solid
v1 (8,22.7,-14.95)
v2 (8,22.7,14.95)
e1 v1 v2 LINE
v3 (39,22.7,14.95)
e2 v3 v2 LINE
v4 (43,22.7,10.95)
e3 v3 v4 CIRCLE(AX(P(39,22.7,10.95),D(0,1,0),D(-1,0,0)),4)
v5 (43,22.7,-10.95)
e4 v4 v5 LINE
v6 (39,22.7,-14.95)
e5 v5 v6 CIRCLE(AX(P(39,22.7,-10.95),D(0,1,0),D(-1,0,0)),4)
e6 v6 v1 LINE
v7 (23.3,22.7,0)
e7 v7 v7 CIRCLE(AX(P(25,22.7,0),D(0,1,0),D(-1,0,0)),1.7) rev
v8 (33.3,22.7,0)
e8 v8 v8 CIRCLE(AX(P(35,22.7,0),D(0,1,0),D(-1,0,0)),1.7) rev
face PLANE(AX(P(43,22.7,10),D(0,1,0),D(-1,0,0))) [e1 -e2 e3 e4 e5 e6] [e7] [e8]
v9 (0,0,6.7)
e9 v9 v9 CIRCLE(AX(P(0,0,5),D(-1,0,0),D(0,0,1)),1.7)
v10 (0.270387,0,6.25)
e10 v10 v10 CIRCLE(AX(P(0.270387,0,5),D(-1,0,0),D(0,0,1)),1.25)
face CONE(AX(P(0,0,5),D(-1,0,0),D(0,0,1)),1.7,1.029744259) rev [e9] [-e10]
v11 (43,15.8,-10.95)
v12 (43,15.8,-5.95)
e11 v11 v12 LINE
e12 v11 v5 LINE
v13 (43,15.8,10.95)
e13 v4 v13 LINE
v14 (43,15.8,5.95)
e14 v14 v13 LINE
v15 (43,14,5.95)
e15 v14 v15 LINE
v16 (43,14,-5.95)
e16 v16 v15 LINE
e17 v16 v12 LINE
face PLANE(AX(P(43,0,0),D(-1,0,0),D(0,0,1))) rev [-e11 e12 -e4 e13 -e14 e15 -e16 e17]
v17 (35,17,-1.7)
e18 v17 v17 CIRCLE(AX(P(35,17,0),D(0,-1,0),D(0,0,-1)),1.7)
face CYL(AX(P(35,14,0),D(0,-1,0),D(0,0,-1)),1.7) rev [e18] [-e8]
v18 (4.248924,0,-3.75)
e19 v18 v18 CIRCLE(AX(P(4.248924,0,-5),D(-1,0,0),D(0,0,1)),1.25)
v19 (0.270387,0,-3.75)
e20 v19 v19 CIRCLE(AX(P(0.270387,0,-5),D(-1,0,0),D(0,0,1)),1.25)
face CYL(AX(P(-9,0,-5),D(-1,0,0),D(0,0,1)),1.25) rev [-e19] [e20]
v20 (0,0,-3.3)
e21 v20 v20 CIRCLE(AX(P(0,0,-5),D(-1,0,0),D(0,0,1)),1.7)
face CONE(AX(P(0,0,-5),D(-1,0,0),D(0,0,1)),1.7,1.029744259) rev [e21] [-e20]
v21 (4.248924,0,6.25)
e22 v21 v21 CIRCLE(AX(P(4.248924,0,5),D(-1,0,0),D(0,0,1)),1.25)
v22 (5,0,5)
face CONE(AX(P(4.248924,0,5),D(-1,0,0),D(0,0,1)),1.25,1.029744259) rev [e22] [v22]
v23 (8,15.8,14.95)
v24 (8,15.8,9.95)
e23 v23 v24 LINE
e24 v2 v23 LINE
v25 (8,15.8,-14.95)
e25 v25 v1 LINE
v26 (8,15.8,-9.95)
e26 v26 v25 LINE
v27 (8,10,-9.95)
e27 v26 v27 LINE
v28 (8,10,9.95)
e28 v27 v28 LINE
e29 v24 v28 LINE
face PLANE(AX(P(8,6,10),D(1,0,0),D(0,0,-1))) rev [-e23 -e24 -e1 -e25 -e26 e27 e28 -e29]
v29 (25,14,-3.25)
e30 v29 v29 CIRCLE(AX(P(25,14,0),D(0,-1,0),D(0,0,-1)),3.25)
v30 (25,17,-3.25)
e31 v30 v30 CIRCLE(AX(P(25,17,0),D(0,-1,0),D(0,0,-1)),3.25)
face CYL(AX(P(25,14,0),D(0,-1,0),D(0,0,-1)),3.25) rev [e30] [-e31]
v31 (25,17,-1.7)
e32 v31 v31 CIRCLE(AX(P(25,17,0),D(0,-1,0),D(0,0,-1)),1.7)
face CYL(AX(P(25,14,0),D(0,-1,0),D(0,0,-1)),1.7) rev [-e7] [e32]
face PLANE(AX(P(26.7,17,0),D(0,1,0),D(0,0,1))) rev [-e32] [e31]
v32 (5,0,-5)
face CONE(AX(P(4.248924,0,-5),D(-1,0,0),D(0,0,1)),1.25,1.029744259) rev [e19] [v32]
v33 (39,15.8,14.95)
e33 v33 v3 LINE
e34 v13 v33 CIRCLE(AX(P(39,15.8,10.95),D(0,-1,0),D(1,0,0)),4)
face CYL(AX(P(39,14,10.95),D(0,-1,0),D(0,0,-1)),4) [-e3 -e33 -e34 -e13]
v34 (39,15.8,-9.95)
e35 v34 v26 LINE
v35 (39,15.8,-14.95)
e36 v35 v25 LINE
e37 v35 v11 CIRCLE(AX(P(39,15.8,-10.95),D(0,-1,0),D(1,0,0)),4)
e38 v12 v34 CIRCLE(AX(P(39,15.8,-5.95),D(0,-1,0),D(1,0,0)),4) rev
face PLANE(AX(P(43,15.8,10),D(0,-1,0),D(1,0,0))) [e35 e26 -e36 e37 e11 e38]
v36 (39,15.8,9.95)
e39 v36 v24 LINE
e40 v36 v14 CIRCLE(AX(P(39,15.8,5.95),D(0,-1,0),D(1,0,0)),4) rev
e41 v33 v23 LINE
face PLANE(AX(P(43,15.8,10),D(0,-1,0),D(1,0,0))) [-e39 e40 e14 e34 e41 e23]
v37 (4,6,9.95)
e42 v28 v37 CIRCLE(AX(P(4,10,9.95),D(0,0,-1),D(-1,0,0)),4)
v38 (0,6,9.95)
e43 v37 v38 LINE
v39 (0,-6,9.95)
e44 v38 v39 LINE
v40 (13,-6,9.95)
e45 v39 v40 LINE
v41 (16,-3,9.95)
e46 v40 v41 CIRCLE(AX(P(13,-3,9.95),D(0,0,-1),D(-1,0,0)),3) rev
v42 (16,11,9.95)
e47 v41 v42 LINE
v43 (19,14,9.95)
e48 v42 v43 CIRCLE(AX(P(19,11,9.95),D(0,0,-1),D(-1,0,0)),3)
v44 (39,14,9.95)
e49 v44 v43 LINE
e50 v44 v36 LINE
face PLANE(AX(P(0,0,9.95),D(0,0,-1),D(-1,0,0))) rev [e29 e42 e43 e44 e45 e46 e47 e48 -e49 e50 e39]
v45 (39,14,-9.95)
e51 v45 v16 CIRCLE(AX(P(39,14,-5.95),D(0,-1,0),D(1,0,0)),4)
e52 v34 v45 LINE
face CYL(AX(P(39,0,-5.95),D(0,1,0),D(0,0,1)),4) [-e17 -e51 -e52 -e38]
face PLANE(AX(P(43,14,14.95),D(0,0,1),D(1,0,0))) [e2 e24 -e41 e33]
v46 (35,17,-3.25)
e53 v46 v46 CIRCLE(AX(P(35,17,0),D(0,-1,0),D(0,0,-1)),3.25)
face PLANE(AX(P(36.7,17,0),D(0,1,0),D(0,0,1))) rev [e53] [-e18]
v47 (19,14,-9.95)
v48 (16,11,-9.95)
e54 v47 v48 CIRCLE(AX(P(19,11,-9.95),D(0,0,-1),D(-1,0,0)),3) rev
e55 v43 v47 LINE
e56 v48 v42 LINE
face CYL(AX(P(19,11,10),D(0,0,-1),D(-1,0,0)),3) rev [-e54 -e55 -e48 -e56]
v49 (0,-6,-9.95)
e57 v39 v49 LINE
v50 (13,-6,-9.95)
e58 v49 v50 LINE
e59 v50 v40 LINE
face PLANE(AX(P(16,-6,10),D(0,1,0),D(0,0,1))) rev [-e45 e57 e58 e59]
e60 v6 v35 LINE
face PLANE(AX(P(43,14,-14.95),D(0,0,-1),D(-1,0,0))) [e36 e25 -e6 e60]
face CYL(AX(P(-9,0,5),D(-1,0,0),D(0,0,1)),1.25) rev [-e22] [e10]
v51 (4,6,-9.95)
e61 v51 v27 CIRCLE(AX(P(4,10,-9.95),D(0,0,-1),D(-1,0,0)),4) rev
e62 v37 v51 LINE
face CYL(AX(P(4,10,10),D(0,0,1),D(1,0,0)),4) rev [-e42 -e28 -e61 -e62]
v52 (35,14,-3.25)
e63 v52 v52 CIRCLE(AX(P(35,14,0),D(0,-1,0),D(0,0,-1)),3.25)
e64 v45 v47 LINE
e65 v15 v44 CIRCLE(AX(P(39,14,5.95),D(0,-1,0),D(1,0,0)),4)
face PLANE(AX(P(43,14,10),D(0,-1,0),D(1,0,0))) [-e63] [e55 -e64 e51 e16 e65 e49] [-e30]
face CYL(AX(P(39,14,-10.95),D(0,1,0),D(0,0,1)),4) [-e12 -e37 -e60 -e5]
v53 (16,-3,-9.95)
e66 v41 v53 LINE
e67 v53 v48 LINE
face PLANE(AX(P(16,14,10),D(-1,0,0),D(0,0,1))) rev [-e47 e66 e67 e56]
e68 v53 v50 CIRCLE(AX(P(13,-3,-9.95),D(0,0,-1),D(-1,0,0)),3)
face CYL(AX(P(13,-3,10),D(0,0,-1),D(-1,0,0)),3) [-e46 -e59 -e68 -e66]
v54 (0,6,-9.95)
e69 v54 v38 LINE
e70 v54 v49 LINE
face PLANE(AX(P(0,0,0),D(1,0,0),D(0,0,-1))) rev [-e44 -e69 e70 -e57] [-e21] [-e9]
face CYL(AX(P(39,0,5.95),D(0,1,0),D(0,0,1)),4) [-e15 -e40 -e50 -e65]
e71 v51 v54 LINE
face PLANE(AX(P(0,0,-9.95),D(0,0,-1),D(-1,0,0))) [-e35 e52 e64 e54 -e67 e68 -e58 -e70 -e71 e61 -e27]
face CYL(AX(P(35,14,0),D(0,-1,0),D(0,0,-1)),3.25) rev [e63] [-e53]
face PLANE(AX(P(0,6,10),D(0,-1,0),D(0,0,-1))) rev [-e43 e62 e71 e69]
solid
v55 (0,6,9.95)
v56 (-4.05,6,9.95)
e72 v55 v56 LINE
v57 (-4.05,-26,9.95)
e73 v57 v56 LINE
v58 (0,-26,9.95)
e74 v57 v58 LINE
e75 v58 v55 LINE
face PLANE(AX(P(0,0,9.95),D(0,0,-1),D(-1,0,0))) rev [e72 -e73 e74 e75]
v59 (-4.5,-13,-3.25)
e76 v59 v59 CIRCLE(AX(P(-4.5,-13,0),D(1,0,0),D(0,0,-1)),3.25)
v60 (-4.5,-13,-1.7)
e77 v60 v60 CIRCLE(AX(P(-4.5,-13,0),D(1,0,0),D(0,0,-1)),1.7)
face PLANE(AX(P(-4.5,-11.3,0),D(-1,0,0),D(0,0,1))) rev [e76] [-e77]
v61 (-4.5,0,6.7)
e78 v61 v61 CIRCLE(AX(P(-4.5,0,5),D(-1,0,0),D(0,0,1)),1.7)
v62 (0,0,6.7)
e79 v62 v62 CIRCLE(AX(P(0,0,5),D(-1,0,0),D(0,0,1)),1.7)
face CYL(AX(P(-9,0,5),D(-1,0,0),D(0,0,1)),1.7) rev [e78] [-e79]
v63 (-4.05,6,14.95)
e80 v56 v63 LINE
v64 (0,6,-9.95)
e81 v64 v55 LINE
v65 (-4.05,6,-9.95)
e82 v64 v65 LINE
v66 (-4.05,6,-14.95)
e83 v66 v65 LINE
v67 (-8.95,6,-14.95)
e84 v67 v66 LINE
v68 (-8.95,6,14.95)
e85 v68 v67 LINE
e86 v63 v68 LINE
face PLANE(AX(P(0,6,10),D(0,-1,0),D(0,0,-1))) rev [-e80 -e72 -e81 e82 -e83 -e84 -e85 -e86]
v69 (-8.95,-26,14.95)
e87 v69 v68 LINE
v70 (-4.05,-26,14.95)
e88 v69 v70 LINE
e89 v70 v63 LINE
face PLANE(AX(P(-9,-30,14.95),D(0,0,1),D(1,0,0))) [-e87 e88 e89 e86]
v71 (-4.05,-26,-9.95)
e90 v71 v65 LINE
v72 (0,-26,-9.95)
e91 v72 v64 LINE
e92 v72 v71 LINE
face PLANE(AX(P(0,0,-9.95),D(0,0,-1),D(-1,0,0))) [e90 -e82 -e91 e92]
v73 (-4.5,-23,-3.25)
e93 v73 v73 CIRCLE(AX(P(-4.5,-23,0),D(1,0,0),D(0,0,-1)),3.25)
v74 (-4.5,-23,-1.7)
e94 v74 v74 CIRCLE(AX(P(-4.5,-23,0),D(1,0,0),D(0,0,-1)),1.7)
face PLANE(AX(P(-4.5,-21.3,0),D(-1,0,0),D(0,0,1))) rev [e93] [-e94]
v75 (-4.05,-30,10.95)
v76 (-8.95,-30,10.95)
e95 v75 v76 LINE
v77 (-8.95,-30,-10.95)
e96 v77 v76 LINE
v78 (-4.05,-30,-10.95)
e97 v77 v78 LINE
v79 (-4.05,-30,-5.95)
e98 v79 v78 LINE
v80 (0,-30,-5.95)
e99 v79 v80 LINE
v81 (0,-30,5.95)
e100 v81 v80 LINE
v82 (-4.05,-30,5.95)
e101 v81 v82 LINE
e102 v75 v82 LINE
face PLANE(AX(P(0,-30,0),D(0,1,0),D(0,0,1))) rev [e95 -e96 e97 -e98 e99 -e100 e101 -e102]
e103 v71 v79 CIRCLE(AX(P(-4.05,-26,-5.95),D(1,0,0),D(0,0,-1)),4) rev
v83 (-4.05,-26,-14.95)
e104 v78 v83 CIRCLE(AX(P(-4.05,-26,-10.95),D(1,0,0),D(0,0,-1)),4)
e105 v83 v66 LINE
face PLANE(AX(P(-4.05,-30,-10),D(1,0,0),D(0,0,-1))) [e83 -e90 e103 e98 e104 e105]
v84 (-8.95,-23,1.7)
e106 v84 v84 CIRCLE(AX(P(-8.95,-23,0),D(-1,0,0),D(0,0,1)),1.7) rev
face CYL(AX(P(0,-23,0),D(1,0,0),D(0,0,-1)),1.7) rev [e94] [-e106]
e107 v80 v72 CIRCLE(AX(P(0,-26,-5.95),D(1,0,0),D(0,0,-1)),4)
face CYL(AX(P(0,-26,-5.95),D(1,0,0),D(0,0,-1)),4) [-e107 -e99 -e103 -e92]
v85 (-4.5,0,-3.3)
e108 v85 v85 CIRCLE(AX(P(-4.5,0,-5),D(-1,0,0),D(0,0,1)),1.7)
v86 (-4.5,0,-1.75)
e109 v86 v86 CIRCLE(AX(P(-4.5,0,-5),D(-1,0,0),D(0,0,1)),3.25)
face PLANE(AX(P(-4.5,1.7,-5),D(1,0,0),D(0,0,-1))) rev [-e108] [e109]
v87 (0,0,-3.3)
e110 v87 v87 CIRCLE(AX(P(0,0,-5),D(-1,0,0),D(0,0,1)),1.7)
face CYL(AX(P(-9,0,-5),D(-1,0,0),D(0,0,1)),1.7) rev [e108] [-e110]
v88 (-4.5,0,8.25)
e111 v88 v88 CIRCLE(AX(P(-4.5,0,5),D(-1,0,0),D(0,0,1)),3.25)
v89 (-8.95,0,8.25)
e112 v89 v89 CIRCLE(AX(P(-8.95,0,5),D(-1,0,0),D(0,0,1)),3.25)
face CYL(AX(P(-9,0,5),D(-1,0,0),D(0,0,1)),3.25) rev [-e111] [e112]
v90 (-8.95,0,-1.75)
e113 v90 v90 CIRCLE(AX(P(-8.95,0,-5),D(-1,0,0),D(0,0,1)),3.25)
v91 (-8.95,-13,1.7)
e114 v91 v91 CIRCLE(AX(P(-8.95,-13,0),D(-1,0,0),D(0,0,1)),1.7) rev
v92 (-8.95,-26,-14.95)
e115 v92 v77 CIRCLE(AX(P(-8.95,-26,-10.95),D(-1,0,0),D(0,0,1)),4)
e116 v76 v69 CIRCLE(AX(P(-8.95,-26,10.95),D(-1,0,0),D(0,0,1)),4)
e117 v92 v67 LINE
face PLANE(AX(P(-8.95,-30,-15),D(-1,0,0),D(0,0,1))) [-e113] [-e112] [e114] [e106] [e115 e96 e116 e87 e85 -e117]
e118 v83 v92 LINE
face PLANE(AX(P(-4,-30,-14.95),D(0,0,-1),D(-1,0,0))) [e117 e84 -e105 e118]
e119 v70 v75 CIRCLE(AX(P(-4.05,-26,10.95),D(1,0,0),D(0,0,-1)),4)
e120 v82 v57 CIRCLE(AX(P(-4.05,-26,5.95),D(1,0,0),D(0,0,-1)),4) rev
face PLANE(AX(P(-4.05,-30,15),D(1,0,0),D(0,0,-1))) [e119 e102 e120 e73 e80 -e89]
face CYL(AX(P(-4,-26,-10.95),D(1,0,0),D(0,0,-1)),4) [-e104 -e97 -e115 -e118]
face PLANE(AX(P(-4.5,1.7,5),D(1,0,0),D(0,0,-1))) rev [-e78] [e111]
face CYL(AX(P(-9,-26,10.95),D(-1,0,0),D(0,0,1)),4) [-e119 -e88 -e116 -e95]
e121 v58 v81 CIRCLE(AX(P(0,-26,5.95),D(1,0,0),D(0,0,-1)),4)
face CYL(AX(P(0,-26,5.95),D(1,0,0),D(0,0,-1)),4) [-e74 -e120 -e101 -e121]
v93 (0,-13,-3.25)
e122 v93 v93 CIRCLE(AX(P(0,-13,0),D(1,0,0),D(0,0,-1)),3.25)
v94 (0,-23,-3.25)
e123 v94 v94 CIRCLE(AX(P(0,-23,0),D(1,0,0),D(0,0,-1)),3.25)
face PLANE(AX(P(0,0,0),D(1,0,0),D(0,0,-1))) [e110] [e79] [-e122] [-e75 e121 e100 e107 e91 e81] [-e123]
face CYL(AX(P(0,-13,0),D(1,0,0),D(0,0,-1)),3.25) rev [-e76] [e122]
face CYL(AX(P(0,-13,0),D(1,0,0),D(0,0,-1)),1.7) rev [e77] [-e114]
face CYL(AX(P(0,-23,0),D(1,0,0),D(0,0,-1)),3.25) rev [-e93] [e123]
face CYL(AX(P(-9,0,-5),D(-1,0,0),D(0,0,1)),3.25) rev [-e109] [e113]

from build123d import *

# Parameters (mm, degrees)
BOSS_EXTRUDE1_DEPTH             = 10
BOSS_EXTRUDE2_DEPTH             = 6
BOSS_EXTRUDE2_DEPTH_BACK        = 30
BOSS_EXTRUDE4_START             = -35
BOSS_EXTRUDE4_DEPTH             = 35
CBORE_FOR_M3_SHCS10_D           = 3.4
CBORE_FOR_M3_SHCS10_CBORE_D     = 6.5
CBORE_FOR_M3_SHCS10_CBORE_DEPTH = 3
CBORE_FOR_M3_SHCS11_D           = 3.4
CBORE_FOR_M3_SHCS11_CBORE_D     = 6.5
CBORE_FOR_M3_SHCS11_CBORE_DEPTH = 4.5
M3X0_5_TAPPED_HOLE1_D           = 2.5
M3X0_5_TAPPED_HOLE1_DEPTH       = 13.248924226
M3X0_5_TAPPED_HOLE1_TIP         = 0.751075774
TOLERANCING_BY                  = 0.05
TOLERANCING_2_BY                = 0.05
TOLERANCING_3_BY                = 0.05
TOLERANCING_4_BY                = 0.05
TOLERANCING_5_BY                = 0.05
TOLERANCING_6_BY                = 0.05
TOLERANCING_7_BY                = 0.05
TOLERANCING_8_BY                = 0.05
TOLERANCING_9_BY                = 0.05
TOLERANCING_10_BY               = 0.05
TOLERANCING_11_BY               = 0.05
TOLERANCING_12_BY               = 0.05
FILLET2_R                       = 3
FILLET3_R                       = 4
FILLET4_R                       = 4


# Read off the part's stored shape, not the designer's step: CBORE for M3 SHCS12
with BuildPart() as part:
    # Sketch1 → Boss-Extrude1 (new, symmetric)
    with BuildSketch(Plane.XY):
        Polygon((16, -6), (0, -6), (0, 6), (8, 6), (8, 14), (16, 14), align=None)
    extrude(amount=BOSS_EXTRUDE1_DEPTH, both=True)

    # Sketch2 → Boss-Extrude2 (add, two sides: drawn at the far end of the back side and taken through both)
    with BuildSketch(Plane(origin=(0, 0, 0), x_dir=(1, 0, 0), z_dir=(0, 1, 0)).offset(-BOSS_EXTRUDE2_DEPTH_BACK)):
        Polygon((-4, 15), (-9, 15), (-9, -15), (-4, -15), (-4, -10), (0, -10), (0, 10), (-4, 10), align=None)
    extrude(amount=BOSS_EXTRUDE2_DEPTH + BOSS_EXTRUDE2_DEPTH_BACK)

    # Sketch7 → Boss-Extrude4 (add)
    with BuildSketch(Plane.ZY.offset(-8).offset(BOSS_EXTRUDE4_START)):
        Polygon((-10, 14), (-10, 15.75), (-15, 15.75), (-15, 22.75), (15, 22.75), (15, 15.75), (10, 15.75), (10, 14), align=None)
    extrude(amount=BOSS_EXTRUDE4_DEPTH)

    # CBORE for M3 SHCS10 (through all)
    with Locations(Plane(origin=(0, 14, 0), x_dir=(-1, 0, 0), z_dir=(0, -1, 0))):
        with Locations((-25, 0), (-35, 0)):
            CounterBoreHole(CBORE_FOR_M3_SHCS10_D / 2, CBORE_FOR_M3_SHCS10_CBORE_D / 2, CBORE_FOR_M3_SHCS10_CBORE_DEPTH)

    # CBORE for M3 SHCS11 (through all)
    with Locations(Plane(origin=(0, 0, 0), x_dir=(0, 0, -1), z_dir=(1, 0, 0))):
        with Locations((0, -13), (0, -23)):
            CounterBoreHole(CBORE_FOR_M3_SHCS11_D / 2, CBORE_FOR_M3_SHCS11_CBORE_D / 2, CBORE_FOR_M3_SHCS11_CBORE_DEPTH)

    # M3x0.5 Tapped Hole1
    with Locations(Plane.ZY.offset(9)):
        with Locations((-5, 0), (5, 0)):
            Hole(M3X0_5_TAPPED_HOLE1_D / 2, depth=M3X0_5_TAPPED_HOLE1_DEPTH)
            with Locations((0, 0, -(M3X0_5_TAPPED_HOLE1_DEPTH + M3X0_5_TAPPED_HOLE1_TIP / 2))):  # 118° drill point
                Cone(0, M3X0_5_TAPPED_HOLE1_D / 2, M3X0_5_TAPPED_HOLE1_TIP, mode=Mode.SUBTRACT)

    # CBORE for M3 SHCS12 outline → CBORE for M3 SHCS12 (revolve, cut)
    with BuildSketch(Plane.YX.offset(-5)):
        Polygon((1.7, 0), (1.25, 0.270387279), (1.25, -9), (3.25, -9), (3.25, -4.5), (1.7, -4.5), align=None)
    revolve(axis=Axis((0, 0, 5), (1, 0, 0)), mode=Mode.SUBTRACT)

    # CBORE for M3 SHCS12 2 outline → CBORE for M3 SHCS12 2 (revolve, cut)
    with BuildSketch(Plane.YX.offset(5)):
        Polygon((1.25, -9), (3.25, -9), (3.25, -4.5), (1.7, -4.5), (1.7, 0), (1.25, 0.270387279), align=None)
    revolve(axis=Axis((0, 0, -5), (1, 0, 0)), mode=Mode.SUBTRACT)

    # Tolerancing: a face moved inward by 0.05
    extrude(part.faces().sort_by_distance((-4, -12, 12.5))[0], amount=TOLERANCING_BY, dir=(-1, 0, 0), mode=Mode.SUBTRACT)

    # Tolerancing 2: a face moved inward by 0.05
    extrude(part.faces().sort_by_distance((16.75, 22.75, 0))[0], amount=TOLERANCING_2_BY, dir=(0, -1, 0), mode=Mode.SUBTRACT)

    # Tolerancing 3: a face moved inward by 0.05
    extrude(part.faces().sort_by_distance((25.5, 15.75, 12.5))[0], amount=TOLERANCING_3_BY, dir=(0, 1, 0), mode=Mode.SUBTRACT)

    # Tolerancing 4: a face moved inward by 0.05
    extrude(part.faces().sort_by_distance((25.5, 19.25, 15))[0], amount=TOLERANCING_4_BY, dir=(0, 0, -1), mode=Mode.SUBTRACT)

    # Tolerancing 5: a face moved inward by 0.05
    extrude(part.faces().sort_by_distance((25.5, 19.25, -15))[0], amount=TOLERANCING_5_BY, dir=(0, 0, 1), mode=Mode.SUBTRACT)

    # Tolerancing 6: a face moved inward by 0.05
    extrude(part.faces().sort_by_distance((25.5, 15.75, -12.5))[0], amount=TOLERANCING_6_BY, dir=(0, 1, 0), mode=Mode.SUBTRACT)

    # Tolerancing 7: a face moved inward by 0.05
    extrude(part.faces().sort_by_distance((7.756910569, -0.383536585, 10))[0], amount=TOLERANCING_7_BY, dir=(0, 0, -1), mode=Mode.SUBTRACT)

    # Tolerancing 8: a face moved inward by 0.05
    extrude(part.faces().sort_by_distance((-6.5, -12, 15))[0], amount=TOLERANCING_8_BY, dir=(0, 0, -1), mode=Mode.SUBTRACT)

    # Tolerancing 9: a face moved inward by 0.05
    extrude(part.faces().sort_by_distance((-9, -3, 0))[0], amount=TOLERANCING_9_BY, dir=(1, 0, 0), mode=Mode.SUBTRACT)

    # Tolerancing 10: a face moved inward by 0.05
    extrude(part.faces().sort_by_distance((-6.5, -12, -15))[0], amount=TOLERANCING_10_BY, dir=(0, 0, 1), mode=Mode.SUBTRACT)

    # Tolerancing 11: a face moved inward by 0.05
    extrude(part.faces().sort_by_distance((-4, -12, -12.5))[0], amount=TOLERANCING_11_BY, dir=(-1, 0, 0), mode=Mode.SUBTRACT)

    # Tolerancing 12: a face moved inward by 0.05
    extrude(part.faces().sort_by_distance((7.756910569, -0.383536585, -10))[0], amount=TOLERANCING_12_BY, dir=(0, 0, 1), mode=Mode.SUBTRACT)

    # Fillet2
    fillet2_edges = [part.edges().sort_by_distance(p)[0] for p in [
        (16, -6, 0),
        (16, 14, 0),
    ]]
    fillet(fillet2_edges, radius=FILLET2_R)

    # Fillet3
    fillet3_edges = [part.edges().sort_by_distance(p)[0] for p in [
        (8, 6, 0),
    ]]
    fillet(fillet3_edges, radius=FILLET3_R)

    # Fillet4
    fillet4_edges = [part.edges().sort_by_distance(p)[0] for p in [
        (-2.025, -30, -9.95),
        (-2.025, -30, 9.95),
        (-6.5, -30, 14.95),
        (-6.5, -30, -14.95),
        (43, 14.9, -9.95),
        (43, 19.25, -14.95),
        (43, 19.25, 14.95),
        (43, 14.9, 9.95),
    ]]
    fillet(fillet4_edges, radius=FILLET4_R)


with BuildPart() as body_2:
    # Split1: the piece on the far side of the plane
    add(part.part)
    split(bisect_by=Plane(origin=(0, 0, 0), x_dir=(0, 0, 1), z_dir=(1, 0, 0)), keep=Keep.BOTTOM)


with BuildPart() as part_1:
    add(part.part)

    # Split1
    split(bisect_by=Plane(origin=(0, 0, 0), x_dir=(0, 0, 1), z_dir=(1, 0, 0)), keep=Keep.TOP)


solid = Compound([body_2.part, part_1.part])
